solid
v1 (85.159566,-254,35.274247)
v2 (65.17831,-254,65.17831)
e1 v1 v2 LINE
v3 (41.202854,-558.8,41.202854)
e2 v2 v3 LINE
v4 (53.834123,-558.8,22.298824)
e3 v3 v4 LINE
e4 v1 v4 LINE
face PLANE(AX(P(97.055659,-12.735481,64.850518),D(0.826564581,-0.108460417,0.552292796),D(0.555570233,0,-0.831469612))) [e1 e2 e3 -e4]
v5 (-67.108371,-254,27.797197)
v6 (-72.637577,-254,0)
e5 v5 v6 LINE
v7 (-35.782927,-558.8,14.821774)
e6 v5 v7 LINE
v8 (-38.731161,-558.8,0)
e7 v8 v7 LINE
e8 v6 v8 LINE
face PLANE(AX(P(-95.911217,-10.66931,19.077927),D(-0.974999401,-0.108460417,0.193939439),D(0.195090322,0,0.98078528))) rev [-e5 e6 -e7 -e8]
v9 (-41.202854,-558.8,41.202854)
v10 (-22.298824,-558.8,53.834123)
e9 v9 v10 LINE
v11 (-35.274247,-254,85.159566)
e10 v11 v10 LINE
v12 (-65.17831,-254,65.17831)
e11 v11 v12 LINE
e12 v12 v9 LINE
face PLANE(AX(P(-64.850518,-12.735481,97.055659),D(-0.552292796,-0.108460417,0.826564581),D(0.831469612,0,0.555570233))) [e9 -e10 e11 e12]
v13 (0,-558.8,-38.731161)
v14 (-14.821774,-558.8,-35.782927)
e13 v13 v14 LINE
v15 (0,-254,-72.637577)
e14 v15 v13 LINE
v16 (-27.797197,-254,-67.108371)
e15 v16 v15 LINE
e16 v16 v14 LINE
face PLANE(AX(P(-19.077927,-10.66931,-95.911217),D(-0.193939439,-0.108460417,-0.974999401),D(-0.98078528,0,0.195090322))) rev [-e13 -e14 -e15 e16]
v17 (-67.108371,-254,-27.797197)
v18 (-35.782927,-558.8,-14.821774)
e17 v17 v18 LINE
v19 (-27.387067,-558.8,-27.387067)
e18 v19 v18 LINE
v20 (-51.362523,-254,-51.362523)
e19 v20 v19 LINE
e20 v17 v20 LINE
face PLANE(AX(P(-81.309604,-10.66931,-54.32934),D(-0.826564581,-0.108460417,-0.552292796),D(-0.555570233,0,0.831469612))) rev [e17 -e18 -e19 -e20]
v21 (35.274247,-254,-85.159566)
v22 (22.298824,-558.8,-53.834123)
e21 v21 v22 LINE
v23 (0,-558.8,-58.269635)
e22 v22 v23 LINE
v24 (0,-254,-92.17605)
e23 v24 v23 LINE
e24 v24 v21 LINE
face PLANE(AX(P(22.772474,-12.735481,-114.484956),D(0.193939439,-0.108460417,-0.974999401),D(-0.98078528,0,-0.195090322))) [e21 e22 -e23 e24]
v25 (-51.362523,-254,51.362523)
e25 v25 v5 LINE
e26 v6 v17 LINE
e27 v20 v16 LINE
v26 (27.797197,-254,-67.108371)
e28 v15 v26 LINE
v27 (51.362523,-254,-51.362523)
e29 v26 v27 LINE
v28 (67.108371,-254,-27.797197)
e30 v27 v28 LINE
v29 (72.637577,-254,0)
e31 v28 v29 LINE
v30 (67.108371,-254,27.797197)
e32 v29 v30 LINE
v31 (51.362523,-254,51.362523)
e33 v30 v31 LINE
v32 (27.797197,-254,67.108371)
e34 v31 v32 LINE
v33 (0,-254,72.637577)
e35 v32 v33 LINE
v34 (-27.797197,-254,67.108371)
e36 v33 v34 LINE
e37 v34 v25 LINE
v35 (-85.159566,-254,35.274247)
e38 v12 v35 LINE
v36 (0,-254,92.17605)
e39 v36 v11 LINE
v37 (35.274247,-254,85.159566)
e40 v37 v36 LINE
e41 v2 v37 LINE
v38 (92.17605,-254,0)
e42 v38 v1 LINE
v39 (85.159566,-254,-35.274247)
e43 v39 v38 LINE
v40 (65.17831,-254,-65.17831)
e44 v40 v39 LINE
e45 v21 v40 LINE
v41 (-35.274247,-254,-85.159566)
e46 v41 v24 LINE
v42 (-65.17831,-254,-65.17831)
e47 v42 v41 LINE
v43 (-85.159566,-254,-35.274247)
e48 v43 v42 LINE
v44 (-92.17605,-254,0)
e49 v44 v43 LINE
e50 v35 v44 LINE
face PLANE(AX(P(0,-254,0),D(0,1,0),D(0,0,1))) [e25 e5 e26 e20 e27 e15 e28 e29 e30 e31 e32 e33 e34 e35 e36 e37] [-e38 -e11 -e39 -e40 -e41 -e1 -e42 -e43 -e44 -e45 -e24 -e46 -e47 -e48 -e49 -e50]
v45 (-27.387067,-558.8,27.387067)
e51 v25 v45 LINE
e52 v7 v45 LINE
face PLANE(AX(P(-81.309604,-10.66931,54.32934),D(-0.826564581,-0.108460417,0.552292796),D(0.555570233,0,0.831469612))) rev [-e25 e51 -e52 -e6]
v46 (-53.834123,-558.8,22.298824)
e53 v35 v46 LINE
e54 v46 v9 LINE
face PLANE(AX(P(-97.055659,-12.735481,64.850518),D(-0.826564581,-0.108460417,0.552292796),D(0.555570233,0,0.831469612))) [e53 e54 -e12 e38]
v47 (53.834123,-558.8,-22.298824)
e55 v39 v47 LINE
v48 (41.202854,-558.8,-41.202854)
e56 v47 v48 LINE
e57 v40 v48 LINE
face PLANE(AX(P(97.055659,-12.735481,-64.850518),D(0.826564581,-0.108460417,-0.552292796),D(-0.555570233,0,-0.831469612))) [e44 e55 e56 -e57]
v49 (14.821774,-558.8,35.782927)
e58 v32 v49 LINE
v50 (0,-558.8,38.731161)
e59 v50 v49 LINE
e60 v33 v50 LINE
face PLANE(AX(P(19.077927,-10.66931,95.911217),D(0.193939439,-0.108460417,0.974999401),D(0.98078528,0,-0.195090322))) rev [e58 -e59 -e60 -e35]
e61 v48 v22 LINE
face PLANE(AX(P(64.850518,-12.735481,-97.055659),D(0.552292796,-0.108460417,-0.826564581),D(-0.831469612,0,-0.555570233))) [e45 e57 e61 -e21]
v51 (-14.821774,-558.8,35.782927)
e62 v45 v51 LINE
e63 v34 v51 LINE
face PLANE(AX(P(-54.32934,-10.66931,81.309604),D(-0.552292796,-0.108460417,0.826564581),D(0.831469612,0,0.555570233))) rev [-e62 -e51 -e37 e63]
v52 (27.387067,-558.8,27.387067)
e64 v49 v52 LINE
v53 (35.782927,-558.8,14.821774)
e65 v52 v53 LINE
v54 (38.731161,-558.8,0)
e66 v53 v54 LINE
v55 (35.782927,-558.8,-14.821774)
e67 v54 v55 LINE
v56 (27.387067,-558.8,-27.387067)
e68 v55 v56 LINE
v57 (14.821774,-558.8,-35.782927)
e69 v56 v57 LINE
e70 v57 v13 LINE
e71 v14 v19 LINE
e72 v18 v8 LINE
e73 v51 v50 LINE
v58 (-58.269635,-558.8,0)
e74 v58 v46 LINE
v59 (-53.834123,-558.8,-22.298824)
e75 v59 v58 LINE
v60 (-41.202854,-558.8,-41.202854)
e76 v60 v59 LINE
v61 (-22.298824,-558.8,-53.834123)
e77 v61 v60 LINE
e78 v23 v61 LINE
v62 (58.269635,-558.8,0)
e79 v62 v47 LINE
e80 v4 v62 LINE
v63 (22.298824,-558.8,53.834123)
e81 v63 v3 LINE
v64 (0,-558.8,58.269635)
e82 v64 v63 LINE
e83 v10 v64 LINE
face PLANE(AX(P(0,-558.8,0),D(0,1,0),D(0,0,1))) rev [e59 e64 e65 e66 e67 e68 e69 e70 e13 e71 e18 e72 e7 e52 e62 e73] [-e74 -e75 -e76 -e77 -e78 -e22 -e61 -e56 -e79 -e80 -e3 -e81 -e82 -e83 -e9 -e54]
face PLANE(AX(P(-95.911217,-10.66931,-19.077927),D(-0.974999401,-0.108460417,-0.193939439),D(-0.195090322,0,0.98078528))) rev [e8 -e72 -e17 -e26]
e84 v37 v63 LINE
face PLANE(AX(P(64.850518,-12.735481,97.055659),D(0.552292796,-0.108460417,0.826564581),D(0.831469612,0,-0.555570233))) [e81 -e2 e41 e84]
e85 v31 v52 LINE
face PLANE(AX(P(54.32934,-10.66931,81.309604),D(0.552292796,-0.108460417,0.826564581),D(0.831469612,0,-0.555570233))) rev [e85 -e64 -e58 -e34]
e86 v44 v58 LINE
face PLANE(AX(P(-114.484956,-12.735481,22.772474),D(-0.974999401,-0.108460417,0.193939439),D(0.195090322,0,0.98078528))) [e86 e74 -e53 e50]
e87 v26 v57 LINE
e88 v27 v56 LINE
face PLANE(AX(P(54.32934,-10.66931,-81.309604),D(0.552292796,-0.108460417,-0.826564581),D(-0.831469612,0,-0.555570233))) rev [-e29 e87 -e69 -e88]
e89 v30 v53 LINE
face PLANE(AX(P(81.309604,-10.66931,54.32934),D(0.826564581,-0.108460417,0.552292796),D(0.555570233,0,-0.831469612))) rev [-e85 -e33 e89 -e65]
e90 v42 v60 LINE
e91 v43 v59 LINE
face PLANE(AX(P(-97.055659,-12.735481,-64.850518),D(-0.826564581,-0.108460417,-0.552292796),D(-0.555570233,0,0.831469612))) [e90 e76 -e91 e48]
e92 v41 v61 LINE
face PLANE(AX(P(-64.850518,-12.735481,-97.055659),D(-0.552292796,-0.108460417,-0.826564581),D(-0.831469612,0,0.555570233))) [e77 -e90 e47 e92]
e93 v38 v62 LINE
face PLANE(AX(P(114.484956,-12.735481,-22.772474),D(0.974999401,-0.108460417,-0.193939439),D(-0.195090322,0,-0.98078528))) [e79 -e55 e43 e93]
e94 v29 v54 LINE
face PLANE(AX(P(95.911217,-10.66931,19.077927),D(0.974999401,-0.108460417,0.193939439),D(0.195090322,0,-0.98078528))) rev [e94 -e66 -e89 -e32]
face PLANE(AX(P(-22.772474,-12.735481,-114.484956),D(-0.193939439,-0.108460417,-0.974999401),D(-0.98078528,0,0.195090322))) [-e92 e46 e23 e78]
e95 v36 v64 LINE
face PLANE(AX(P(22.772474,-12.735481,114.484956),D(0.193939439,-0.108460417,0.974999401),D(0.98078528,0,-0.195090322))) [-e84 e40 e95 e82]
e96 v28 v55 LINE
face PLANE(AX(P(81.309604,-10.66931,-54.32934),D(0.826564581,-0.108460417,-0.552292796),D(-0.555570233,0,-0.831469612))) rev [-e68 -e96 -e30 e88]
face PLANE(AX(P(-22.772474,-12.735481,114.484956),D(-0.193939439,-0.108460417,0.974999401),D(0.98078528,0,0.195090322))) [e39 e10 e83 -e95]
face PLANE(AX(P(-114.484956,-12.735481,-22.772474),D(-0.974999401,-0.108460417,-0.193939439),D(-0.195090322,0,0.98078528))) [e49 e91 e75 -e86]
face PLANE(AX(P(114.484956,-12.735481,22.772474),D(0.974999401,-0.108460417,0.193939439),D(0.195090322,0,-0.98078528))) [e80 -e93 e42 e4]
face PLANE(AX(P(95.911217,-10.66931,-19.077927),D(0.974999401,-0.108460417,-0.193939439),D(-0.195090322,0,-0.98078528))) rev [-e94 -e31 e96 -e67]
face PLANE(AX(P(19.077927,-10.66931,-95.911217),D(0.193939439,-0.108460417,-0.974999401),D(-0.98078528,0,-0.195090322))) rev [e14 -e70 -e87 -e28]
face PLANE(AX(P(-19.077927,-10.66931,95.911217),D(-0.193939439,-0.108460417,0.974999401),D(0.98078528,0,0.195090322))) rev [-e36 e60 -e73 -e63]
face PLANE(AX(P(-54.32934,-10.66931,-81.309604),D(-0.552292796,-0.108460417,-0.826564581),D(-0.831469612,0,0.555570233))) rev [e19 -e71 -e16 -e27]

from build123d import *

# Parameters (mm, degrees)
SHELL1_T                = -19.05
SKETCH3_W               = 50.8
SKETCH3_H               = 50.8
BOSS_EXTRUDE1_DEPTH     = 35.56
CIRPATTERN1_COUNT       = 16
CUT_EXTRUDE1_REACH      = 373.537
SKETCH8_R               = 38.1
FILLET1_R               = 25.4
CUT_EXTRUDE2_DEPTH      = 372.53665238
CUT_EXTRUDE2_DEPTH_BACK = 25.4
SKETCH9_R               = 186.983253042


with BuildPart() as part:
    # Sketch1 → Loft1 section 0
    with BuildSketch(Plane(origin=(0, 0, 0), x_dir=(1, 0, 0), z_dir=(0, 1, 0))):
        with BuildLine():
            Line((120.431396889, 0), (111.264102658, 46.087100326))
            Line((111.264102658, 46.087100326), (85.157857408, 85.157857408))
            Line((85.157857408, 85.157857408), (46.087100326, 111.264102658))
            Line((46.087100326, 111.264102658), (0, 120.431396889))
            Line((0, 120.431396889), (-46.087100326, 111.264102658))
            Line((-46.087100326, 111.264102658), (-85.157857408, 85.157857408))
            Line((-85.157857408, 85.157857408), (-111.264102658, 46.087100326))
            Line((-111.264102658, 46.087100326), (-120.431396889, 0))
            Line((-120.431396889, 0), (-111.264102658, -46.087100326))
            Line((-111.264102658, -46.087100326), (-85.157857408, -85.157857408))
            Line((-85.157857408, -85.157857408), (-46.087100326, -111.264102658))
            Line((-46.087100326, -111.264102658), (0, -120.431396889))
            Line((0, -120.431396889), (46.087100326, -111.264102658))
            Line((46.087100326, -111.264102658), (85.157857408, -85.157857408))
            Line((85.157857408, -85.157857408), (111.264102658, -46.087100326))
            Line((111.264102658, -46.087100326), (120.431396889, 0))
        make_face()
    # Sketch2 → Loft1 section 1
    with BuildSketch(Plane(origin=(0, -558.8, 0), x_dir=(1, 0, 0), z_dir=(0, 1, 0))):
        with BuildLine():
            Line((58.269634692, 0), (53.834122858, 22.298823806))
            Line((53.834122858, 22.298823806), (41.202853828, 41.202853828))
            Line((41.202853828, 41.202853828), (22.298823806, 53.834122858))
            Line((22.298823806, 53.834122858), (0, 58.269634692))
            Line((0, 58.269634692), (-22.298823806, 53.834122858))
            Line((-22.298823806, 53.834122858), (-41.202853828, 41.202853828))
            Line((-41.202853828, 41.202853828), (-53.834122858, 22.298823806))
            Line((-53.834122858, 22.298823806), (-58.269634692, 0))
            Line((-58.269634692, 0), (-53.834122858, -22.298823806))
            Line((-53.834122858, -22.298823806), (-41.202853828, -41.202853828))
            Line((-41.202853828, -41.202853828), (-22.298823806, -53.834122858))
            Line((-22.298823806, -53.834122858), (0, -58.269634692))
            Line((0, -58.269634692), (22.298823806, -53.834122858))
            Line((22.298823806, -53.834122858), (41.202853828, -41.202853828))
            Line((41.202853828, -41.202853828), (53.834122858, -22.298823806))
            Line((53.834122858, -22.298823806), (58.269634692, 0))
        make_face()
    loft()

    # Shell1
    shell1_openings = [part.faces().sort_by_distance(p)[0] for p in [
        (0, -558.8, 0),
        (0, 0, 0),
    ]]
    offset(amount=SHELL1_T, openings=shell1_openings, kind=Kind.INTERSECTION)

    # Sketch3 → Boss-Extrude1 (add)
    with BuildSketch(Plane.XY):
        with Locations((-56.063793247, -203.2)):
            Rectangle(SKETCH3_W, SKETCH3_H)
    boss_extrude1 = extrude(amount=-BOSS_EXTRUDE1_DEPTH)

    # CirPattern1: Boss-Extrude1 ×16 about axis
    cirpattern1_axis = Axis((0, 0, 0), (0, 1, 0))
    for i in range(1, CIRPATTERN1_COUNT):
        add(boss_extrude1.rotate(cirpattern1_axis, i * 360 / CIRPATTERN1_COUNT))

    # Sketch6 → Cut-Revolve1 (revolve, cut)
    with BuildSketch(Plane.XY, mode=Mode.PRIVATE) as cut_revolve1_sk:
        with BuildLine():
            Line((-81.11418083, -177.8), (-12.701359037, -177.8))
            Line((-12.701359037, -177.8), (-12.701359037, -228.6))
            Line((-12.701359037, -228.6), (-30.663793247, -228.6))
            ThreePointArc((-30.663793247, -228.6), (-63.531337698, -210.789754977), (-81.11418083, -177.8))
        make_face()
    revolve(cut_revolve1_sk.sketch.rotate(Axis((0, -222.066544959, 0), (0, 1, 0)), 180), axis=Axis((0, -222.066544959, 0), (0, 1, 0)), mode=Mode.SUBTRACT)

    # Sketch8 → Cut-Extrude1 (cut, up to next)
    with BuildSketch(Plane(origin=(0, -228.6, 0), x_dir=(1, 0, 0), z_dir=(0, 1, 0)), mode=Mode.PRIVATE) as cut_extrude1_sk1:
        with Locations(Location((0, 0, 0), (0, 0, 180))):
            Circle(SKETCH8_R)
    cut_extrude1_tool1 = extrude(cut_extrude1_sk1.sketch, amount=CUT_EXTRUDE1_REACH, mode=Mode.PRIVATE) & part.part
    add(cut_extrude1_tool1.solids().sort_by_distance((0, -228.6, 0))[0], mode=Mode.SUBTRACT)

    # Fillet1
    # the kernel refuses this fillet: 25.4 mm, written as the material it takes off along each edge
    with BuildSketch(Plane(origin=(0, -228.6, 0), x_dir=(-1, 0, 0), z_dir=(0, 0, -1))) as fillet1_piece_1:
        with BuildLine():
            CenterArc((47.997893869, 25.4), FILLET1_R, 247.065356901, 22.934643099)
            Line((38.1, 2.007871047), (37.902042123, 1.540028468))
            ThreePointArc((37.902042123, 1.540028468), (37.592, 1.003935523), (37.592, 0))
            Line((37.592, 0), (38.1, -0.508))
            Line((38.1, -0.508), (47.997893869, -0.508))
            Line((47.997893869, -0.508), (47.997893869, 0))
        make_face()
    revolve(axis=Axis((0, -228.6, 0), (0, 1, 0)), mode=Mode.SUBTRACT)

    # Sketch9 → Cut-Extrude2 (cut, two sides: drawn at the far end of the back side and taken through both)
    with BuildSketch(Plane(origin=(0, -228.6, 0), x_dir=(1, 0, 0), z_dir=(0, 1, 0)).offset(-CUT_EXTRUDE2_DEPTH_BACK)):
        Circle(SKETCH9_R)
    extrude(amount=CUT_EXTRUDE2_DEPTH + CUT_EXTRUDE2_DEPTH_BACK, mode=Mode.SUBTRACT)


solid = part.part
